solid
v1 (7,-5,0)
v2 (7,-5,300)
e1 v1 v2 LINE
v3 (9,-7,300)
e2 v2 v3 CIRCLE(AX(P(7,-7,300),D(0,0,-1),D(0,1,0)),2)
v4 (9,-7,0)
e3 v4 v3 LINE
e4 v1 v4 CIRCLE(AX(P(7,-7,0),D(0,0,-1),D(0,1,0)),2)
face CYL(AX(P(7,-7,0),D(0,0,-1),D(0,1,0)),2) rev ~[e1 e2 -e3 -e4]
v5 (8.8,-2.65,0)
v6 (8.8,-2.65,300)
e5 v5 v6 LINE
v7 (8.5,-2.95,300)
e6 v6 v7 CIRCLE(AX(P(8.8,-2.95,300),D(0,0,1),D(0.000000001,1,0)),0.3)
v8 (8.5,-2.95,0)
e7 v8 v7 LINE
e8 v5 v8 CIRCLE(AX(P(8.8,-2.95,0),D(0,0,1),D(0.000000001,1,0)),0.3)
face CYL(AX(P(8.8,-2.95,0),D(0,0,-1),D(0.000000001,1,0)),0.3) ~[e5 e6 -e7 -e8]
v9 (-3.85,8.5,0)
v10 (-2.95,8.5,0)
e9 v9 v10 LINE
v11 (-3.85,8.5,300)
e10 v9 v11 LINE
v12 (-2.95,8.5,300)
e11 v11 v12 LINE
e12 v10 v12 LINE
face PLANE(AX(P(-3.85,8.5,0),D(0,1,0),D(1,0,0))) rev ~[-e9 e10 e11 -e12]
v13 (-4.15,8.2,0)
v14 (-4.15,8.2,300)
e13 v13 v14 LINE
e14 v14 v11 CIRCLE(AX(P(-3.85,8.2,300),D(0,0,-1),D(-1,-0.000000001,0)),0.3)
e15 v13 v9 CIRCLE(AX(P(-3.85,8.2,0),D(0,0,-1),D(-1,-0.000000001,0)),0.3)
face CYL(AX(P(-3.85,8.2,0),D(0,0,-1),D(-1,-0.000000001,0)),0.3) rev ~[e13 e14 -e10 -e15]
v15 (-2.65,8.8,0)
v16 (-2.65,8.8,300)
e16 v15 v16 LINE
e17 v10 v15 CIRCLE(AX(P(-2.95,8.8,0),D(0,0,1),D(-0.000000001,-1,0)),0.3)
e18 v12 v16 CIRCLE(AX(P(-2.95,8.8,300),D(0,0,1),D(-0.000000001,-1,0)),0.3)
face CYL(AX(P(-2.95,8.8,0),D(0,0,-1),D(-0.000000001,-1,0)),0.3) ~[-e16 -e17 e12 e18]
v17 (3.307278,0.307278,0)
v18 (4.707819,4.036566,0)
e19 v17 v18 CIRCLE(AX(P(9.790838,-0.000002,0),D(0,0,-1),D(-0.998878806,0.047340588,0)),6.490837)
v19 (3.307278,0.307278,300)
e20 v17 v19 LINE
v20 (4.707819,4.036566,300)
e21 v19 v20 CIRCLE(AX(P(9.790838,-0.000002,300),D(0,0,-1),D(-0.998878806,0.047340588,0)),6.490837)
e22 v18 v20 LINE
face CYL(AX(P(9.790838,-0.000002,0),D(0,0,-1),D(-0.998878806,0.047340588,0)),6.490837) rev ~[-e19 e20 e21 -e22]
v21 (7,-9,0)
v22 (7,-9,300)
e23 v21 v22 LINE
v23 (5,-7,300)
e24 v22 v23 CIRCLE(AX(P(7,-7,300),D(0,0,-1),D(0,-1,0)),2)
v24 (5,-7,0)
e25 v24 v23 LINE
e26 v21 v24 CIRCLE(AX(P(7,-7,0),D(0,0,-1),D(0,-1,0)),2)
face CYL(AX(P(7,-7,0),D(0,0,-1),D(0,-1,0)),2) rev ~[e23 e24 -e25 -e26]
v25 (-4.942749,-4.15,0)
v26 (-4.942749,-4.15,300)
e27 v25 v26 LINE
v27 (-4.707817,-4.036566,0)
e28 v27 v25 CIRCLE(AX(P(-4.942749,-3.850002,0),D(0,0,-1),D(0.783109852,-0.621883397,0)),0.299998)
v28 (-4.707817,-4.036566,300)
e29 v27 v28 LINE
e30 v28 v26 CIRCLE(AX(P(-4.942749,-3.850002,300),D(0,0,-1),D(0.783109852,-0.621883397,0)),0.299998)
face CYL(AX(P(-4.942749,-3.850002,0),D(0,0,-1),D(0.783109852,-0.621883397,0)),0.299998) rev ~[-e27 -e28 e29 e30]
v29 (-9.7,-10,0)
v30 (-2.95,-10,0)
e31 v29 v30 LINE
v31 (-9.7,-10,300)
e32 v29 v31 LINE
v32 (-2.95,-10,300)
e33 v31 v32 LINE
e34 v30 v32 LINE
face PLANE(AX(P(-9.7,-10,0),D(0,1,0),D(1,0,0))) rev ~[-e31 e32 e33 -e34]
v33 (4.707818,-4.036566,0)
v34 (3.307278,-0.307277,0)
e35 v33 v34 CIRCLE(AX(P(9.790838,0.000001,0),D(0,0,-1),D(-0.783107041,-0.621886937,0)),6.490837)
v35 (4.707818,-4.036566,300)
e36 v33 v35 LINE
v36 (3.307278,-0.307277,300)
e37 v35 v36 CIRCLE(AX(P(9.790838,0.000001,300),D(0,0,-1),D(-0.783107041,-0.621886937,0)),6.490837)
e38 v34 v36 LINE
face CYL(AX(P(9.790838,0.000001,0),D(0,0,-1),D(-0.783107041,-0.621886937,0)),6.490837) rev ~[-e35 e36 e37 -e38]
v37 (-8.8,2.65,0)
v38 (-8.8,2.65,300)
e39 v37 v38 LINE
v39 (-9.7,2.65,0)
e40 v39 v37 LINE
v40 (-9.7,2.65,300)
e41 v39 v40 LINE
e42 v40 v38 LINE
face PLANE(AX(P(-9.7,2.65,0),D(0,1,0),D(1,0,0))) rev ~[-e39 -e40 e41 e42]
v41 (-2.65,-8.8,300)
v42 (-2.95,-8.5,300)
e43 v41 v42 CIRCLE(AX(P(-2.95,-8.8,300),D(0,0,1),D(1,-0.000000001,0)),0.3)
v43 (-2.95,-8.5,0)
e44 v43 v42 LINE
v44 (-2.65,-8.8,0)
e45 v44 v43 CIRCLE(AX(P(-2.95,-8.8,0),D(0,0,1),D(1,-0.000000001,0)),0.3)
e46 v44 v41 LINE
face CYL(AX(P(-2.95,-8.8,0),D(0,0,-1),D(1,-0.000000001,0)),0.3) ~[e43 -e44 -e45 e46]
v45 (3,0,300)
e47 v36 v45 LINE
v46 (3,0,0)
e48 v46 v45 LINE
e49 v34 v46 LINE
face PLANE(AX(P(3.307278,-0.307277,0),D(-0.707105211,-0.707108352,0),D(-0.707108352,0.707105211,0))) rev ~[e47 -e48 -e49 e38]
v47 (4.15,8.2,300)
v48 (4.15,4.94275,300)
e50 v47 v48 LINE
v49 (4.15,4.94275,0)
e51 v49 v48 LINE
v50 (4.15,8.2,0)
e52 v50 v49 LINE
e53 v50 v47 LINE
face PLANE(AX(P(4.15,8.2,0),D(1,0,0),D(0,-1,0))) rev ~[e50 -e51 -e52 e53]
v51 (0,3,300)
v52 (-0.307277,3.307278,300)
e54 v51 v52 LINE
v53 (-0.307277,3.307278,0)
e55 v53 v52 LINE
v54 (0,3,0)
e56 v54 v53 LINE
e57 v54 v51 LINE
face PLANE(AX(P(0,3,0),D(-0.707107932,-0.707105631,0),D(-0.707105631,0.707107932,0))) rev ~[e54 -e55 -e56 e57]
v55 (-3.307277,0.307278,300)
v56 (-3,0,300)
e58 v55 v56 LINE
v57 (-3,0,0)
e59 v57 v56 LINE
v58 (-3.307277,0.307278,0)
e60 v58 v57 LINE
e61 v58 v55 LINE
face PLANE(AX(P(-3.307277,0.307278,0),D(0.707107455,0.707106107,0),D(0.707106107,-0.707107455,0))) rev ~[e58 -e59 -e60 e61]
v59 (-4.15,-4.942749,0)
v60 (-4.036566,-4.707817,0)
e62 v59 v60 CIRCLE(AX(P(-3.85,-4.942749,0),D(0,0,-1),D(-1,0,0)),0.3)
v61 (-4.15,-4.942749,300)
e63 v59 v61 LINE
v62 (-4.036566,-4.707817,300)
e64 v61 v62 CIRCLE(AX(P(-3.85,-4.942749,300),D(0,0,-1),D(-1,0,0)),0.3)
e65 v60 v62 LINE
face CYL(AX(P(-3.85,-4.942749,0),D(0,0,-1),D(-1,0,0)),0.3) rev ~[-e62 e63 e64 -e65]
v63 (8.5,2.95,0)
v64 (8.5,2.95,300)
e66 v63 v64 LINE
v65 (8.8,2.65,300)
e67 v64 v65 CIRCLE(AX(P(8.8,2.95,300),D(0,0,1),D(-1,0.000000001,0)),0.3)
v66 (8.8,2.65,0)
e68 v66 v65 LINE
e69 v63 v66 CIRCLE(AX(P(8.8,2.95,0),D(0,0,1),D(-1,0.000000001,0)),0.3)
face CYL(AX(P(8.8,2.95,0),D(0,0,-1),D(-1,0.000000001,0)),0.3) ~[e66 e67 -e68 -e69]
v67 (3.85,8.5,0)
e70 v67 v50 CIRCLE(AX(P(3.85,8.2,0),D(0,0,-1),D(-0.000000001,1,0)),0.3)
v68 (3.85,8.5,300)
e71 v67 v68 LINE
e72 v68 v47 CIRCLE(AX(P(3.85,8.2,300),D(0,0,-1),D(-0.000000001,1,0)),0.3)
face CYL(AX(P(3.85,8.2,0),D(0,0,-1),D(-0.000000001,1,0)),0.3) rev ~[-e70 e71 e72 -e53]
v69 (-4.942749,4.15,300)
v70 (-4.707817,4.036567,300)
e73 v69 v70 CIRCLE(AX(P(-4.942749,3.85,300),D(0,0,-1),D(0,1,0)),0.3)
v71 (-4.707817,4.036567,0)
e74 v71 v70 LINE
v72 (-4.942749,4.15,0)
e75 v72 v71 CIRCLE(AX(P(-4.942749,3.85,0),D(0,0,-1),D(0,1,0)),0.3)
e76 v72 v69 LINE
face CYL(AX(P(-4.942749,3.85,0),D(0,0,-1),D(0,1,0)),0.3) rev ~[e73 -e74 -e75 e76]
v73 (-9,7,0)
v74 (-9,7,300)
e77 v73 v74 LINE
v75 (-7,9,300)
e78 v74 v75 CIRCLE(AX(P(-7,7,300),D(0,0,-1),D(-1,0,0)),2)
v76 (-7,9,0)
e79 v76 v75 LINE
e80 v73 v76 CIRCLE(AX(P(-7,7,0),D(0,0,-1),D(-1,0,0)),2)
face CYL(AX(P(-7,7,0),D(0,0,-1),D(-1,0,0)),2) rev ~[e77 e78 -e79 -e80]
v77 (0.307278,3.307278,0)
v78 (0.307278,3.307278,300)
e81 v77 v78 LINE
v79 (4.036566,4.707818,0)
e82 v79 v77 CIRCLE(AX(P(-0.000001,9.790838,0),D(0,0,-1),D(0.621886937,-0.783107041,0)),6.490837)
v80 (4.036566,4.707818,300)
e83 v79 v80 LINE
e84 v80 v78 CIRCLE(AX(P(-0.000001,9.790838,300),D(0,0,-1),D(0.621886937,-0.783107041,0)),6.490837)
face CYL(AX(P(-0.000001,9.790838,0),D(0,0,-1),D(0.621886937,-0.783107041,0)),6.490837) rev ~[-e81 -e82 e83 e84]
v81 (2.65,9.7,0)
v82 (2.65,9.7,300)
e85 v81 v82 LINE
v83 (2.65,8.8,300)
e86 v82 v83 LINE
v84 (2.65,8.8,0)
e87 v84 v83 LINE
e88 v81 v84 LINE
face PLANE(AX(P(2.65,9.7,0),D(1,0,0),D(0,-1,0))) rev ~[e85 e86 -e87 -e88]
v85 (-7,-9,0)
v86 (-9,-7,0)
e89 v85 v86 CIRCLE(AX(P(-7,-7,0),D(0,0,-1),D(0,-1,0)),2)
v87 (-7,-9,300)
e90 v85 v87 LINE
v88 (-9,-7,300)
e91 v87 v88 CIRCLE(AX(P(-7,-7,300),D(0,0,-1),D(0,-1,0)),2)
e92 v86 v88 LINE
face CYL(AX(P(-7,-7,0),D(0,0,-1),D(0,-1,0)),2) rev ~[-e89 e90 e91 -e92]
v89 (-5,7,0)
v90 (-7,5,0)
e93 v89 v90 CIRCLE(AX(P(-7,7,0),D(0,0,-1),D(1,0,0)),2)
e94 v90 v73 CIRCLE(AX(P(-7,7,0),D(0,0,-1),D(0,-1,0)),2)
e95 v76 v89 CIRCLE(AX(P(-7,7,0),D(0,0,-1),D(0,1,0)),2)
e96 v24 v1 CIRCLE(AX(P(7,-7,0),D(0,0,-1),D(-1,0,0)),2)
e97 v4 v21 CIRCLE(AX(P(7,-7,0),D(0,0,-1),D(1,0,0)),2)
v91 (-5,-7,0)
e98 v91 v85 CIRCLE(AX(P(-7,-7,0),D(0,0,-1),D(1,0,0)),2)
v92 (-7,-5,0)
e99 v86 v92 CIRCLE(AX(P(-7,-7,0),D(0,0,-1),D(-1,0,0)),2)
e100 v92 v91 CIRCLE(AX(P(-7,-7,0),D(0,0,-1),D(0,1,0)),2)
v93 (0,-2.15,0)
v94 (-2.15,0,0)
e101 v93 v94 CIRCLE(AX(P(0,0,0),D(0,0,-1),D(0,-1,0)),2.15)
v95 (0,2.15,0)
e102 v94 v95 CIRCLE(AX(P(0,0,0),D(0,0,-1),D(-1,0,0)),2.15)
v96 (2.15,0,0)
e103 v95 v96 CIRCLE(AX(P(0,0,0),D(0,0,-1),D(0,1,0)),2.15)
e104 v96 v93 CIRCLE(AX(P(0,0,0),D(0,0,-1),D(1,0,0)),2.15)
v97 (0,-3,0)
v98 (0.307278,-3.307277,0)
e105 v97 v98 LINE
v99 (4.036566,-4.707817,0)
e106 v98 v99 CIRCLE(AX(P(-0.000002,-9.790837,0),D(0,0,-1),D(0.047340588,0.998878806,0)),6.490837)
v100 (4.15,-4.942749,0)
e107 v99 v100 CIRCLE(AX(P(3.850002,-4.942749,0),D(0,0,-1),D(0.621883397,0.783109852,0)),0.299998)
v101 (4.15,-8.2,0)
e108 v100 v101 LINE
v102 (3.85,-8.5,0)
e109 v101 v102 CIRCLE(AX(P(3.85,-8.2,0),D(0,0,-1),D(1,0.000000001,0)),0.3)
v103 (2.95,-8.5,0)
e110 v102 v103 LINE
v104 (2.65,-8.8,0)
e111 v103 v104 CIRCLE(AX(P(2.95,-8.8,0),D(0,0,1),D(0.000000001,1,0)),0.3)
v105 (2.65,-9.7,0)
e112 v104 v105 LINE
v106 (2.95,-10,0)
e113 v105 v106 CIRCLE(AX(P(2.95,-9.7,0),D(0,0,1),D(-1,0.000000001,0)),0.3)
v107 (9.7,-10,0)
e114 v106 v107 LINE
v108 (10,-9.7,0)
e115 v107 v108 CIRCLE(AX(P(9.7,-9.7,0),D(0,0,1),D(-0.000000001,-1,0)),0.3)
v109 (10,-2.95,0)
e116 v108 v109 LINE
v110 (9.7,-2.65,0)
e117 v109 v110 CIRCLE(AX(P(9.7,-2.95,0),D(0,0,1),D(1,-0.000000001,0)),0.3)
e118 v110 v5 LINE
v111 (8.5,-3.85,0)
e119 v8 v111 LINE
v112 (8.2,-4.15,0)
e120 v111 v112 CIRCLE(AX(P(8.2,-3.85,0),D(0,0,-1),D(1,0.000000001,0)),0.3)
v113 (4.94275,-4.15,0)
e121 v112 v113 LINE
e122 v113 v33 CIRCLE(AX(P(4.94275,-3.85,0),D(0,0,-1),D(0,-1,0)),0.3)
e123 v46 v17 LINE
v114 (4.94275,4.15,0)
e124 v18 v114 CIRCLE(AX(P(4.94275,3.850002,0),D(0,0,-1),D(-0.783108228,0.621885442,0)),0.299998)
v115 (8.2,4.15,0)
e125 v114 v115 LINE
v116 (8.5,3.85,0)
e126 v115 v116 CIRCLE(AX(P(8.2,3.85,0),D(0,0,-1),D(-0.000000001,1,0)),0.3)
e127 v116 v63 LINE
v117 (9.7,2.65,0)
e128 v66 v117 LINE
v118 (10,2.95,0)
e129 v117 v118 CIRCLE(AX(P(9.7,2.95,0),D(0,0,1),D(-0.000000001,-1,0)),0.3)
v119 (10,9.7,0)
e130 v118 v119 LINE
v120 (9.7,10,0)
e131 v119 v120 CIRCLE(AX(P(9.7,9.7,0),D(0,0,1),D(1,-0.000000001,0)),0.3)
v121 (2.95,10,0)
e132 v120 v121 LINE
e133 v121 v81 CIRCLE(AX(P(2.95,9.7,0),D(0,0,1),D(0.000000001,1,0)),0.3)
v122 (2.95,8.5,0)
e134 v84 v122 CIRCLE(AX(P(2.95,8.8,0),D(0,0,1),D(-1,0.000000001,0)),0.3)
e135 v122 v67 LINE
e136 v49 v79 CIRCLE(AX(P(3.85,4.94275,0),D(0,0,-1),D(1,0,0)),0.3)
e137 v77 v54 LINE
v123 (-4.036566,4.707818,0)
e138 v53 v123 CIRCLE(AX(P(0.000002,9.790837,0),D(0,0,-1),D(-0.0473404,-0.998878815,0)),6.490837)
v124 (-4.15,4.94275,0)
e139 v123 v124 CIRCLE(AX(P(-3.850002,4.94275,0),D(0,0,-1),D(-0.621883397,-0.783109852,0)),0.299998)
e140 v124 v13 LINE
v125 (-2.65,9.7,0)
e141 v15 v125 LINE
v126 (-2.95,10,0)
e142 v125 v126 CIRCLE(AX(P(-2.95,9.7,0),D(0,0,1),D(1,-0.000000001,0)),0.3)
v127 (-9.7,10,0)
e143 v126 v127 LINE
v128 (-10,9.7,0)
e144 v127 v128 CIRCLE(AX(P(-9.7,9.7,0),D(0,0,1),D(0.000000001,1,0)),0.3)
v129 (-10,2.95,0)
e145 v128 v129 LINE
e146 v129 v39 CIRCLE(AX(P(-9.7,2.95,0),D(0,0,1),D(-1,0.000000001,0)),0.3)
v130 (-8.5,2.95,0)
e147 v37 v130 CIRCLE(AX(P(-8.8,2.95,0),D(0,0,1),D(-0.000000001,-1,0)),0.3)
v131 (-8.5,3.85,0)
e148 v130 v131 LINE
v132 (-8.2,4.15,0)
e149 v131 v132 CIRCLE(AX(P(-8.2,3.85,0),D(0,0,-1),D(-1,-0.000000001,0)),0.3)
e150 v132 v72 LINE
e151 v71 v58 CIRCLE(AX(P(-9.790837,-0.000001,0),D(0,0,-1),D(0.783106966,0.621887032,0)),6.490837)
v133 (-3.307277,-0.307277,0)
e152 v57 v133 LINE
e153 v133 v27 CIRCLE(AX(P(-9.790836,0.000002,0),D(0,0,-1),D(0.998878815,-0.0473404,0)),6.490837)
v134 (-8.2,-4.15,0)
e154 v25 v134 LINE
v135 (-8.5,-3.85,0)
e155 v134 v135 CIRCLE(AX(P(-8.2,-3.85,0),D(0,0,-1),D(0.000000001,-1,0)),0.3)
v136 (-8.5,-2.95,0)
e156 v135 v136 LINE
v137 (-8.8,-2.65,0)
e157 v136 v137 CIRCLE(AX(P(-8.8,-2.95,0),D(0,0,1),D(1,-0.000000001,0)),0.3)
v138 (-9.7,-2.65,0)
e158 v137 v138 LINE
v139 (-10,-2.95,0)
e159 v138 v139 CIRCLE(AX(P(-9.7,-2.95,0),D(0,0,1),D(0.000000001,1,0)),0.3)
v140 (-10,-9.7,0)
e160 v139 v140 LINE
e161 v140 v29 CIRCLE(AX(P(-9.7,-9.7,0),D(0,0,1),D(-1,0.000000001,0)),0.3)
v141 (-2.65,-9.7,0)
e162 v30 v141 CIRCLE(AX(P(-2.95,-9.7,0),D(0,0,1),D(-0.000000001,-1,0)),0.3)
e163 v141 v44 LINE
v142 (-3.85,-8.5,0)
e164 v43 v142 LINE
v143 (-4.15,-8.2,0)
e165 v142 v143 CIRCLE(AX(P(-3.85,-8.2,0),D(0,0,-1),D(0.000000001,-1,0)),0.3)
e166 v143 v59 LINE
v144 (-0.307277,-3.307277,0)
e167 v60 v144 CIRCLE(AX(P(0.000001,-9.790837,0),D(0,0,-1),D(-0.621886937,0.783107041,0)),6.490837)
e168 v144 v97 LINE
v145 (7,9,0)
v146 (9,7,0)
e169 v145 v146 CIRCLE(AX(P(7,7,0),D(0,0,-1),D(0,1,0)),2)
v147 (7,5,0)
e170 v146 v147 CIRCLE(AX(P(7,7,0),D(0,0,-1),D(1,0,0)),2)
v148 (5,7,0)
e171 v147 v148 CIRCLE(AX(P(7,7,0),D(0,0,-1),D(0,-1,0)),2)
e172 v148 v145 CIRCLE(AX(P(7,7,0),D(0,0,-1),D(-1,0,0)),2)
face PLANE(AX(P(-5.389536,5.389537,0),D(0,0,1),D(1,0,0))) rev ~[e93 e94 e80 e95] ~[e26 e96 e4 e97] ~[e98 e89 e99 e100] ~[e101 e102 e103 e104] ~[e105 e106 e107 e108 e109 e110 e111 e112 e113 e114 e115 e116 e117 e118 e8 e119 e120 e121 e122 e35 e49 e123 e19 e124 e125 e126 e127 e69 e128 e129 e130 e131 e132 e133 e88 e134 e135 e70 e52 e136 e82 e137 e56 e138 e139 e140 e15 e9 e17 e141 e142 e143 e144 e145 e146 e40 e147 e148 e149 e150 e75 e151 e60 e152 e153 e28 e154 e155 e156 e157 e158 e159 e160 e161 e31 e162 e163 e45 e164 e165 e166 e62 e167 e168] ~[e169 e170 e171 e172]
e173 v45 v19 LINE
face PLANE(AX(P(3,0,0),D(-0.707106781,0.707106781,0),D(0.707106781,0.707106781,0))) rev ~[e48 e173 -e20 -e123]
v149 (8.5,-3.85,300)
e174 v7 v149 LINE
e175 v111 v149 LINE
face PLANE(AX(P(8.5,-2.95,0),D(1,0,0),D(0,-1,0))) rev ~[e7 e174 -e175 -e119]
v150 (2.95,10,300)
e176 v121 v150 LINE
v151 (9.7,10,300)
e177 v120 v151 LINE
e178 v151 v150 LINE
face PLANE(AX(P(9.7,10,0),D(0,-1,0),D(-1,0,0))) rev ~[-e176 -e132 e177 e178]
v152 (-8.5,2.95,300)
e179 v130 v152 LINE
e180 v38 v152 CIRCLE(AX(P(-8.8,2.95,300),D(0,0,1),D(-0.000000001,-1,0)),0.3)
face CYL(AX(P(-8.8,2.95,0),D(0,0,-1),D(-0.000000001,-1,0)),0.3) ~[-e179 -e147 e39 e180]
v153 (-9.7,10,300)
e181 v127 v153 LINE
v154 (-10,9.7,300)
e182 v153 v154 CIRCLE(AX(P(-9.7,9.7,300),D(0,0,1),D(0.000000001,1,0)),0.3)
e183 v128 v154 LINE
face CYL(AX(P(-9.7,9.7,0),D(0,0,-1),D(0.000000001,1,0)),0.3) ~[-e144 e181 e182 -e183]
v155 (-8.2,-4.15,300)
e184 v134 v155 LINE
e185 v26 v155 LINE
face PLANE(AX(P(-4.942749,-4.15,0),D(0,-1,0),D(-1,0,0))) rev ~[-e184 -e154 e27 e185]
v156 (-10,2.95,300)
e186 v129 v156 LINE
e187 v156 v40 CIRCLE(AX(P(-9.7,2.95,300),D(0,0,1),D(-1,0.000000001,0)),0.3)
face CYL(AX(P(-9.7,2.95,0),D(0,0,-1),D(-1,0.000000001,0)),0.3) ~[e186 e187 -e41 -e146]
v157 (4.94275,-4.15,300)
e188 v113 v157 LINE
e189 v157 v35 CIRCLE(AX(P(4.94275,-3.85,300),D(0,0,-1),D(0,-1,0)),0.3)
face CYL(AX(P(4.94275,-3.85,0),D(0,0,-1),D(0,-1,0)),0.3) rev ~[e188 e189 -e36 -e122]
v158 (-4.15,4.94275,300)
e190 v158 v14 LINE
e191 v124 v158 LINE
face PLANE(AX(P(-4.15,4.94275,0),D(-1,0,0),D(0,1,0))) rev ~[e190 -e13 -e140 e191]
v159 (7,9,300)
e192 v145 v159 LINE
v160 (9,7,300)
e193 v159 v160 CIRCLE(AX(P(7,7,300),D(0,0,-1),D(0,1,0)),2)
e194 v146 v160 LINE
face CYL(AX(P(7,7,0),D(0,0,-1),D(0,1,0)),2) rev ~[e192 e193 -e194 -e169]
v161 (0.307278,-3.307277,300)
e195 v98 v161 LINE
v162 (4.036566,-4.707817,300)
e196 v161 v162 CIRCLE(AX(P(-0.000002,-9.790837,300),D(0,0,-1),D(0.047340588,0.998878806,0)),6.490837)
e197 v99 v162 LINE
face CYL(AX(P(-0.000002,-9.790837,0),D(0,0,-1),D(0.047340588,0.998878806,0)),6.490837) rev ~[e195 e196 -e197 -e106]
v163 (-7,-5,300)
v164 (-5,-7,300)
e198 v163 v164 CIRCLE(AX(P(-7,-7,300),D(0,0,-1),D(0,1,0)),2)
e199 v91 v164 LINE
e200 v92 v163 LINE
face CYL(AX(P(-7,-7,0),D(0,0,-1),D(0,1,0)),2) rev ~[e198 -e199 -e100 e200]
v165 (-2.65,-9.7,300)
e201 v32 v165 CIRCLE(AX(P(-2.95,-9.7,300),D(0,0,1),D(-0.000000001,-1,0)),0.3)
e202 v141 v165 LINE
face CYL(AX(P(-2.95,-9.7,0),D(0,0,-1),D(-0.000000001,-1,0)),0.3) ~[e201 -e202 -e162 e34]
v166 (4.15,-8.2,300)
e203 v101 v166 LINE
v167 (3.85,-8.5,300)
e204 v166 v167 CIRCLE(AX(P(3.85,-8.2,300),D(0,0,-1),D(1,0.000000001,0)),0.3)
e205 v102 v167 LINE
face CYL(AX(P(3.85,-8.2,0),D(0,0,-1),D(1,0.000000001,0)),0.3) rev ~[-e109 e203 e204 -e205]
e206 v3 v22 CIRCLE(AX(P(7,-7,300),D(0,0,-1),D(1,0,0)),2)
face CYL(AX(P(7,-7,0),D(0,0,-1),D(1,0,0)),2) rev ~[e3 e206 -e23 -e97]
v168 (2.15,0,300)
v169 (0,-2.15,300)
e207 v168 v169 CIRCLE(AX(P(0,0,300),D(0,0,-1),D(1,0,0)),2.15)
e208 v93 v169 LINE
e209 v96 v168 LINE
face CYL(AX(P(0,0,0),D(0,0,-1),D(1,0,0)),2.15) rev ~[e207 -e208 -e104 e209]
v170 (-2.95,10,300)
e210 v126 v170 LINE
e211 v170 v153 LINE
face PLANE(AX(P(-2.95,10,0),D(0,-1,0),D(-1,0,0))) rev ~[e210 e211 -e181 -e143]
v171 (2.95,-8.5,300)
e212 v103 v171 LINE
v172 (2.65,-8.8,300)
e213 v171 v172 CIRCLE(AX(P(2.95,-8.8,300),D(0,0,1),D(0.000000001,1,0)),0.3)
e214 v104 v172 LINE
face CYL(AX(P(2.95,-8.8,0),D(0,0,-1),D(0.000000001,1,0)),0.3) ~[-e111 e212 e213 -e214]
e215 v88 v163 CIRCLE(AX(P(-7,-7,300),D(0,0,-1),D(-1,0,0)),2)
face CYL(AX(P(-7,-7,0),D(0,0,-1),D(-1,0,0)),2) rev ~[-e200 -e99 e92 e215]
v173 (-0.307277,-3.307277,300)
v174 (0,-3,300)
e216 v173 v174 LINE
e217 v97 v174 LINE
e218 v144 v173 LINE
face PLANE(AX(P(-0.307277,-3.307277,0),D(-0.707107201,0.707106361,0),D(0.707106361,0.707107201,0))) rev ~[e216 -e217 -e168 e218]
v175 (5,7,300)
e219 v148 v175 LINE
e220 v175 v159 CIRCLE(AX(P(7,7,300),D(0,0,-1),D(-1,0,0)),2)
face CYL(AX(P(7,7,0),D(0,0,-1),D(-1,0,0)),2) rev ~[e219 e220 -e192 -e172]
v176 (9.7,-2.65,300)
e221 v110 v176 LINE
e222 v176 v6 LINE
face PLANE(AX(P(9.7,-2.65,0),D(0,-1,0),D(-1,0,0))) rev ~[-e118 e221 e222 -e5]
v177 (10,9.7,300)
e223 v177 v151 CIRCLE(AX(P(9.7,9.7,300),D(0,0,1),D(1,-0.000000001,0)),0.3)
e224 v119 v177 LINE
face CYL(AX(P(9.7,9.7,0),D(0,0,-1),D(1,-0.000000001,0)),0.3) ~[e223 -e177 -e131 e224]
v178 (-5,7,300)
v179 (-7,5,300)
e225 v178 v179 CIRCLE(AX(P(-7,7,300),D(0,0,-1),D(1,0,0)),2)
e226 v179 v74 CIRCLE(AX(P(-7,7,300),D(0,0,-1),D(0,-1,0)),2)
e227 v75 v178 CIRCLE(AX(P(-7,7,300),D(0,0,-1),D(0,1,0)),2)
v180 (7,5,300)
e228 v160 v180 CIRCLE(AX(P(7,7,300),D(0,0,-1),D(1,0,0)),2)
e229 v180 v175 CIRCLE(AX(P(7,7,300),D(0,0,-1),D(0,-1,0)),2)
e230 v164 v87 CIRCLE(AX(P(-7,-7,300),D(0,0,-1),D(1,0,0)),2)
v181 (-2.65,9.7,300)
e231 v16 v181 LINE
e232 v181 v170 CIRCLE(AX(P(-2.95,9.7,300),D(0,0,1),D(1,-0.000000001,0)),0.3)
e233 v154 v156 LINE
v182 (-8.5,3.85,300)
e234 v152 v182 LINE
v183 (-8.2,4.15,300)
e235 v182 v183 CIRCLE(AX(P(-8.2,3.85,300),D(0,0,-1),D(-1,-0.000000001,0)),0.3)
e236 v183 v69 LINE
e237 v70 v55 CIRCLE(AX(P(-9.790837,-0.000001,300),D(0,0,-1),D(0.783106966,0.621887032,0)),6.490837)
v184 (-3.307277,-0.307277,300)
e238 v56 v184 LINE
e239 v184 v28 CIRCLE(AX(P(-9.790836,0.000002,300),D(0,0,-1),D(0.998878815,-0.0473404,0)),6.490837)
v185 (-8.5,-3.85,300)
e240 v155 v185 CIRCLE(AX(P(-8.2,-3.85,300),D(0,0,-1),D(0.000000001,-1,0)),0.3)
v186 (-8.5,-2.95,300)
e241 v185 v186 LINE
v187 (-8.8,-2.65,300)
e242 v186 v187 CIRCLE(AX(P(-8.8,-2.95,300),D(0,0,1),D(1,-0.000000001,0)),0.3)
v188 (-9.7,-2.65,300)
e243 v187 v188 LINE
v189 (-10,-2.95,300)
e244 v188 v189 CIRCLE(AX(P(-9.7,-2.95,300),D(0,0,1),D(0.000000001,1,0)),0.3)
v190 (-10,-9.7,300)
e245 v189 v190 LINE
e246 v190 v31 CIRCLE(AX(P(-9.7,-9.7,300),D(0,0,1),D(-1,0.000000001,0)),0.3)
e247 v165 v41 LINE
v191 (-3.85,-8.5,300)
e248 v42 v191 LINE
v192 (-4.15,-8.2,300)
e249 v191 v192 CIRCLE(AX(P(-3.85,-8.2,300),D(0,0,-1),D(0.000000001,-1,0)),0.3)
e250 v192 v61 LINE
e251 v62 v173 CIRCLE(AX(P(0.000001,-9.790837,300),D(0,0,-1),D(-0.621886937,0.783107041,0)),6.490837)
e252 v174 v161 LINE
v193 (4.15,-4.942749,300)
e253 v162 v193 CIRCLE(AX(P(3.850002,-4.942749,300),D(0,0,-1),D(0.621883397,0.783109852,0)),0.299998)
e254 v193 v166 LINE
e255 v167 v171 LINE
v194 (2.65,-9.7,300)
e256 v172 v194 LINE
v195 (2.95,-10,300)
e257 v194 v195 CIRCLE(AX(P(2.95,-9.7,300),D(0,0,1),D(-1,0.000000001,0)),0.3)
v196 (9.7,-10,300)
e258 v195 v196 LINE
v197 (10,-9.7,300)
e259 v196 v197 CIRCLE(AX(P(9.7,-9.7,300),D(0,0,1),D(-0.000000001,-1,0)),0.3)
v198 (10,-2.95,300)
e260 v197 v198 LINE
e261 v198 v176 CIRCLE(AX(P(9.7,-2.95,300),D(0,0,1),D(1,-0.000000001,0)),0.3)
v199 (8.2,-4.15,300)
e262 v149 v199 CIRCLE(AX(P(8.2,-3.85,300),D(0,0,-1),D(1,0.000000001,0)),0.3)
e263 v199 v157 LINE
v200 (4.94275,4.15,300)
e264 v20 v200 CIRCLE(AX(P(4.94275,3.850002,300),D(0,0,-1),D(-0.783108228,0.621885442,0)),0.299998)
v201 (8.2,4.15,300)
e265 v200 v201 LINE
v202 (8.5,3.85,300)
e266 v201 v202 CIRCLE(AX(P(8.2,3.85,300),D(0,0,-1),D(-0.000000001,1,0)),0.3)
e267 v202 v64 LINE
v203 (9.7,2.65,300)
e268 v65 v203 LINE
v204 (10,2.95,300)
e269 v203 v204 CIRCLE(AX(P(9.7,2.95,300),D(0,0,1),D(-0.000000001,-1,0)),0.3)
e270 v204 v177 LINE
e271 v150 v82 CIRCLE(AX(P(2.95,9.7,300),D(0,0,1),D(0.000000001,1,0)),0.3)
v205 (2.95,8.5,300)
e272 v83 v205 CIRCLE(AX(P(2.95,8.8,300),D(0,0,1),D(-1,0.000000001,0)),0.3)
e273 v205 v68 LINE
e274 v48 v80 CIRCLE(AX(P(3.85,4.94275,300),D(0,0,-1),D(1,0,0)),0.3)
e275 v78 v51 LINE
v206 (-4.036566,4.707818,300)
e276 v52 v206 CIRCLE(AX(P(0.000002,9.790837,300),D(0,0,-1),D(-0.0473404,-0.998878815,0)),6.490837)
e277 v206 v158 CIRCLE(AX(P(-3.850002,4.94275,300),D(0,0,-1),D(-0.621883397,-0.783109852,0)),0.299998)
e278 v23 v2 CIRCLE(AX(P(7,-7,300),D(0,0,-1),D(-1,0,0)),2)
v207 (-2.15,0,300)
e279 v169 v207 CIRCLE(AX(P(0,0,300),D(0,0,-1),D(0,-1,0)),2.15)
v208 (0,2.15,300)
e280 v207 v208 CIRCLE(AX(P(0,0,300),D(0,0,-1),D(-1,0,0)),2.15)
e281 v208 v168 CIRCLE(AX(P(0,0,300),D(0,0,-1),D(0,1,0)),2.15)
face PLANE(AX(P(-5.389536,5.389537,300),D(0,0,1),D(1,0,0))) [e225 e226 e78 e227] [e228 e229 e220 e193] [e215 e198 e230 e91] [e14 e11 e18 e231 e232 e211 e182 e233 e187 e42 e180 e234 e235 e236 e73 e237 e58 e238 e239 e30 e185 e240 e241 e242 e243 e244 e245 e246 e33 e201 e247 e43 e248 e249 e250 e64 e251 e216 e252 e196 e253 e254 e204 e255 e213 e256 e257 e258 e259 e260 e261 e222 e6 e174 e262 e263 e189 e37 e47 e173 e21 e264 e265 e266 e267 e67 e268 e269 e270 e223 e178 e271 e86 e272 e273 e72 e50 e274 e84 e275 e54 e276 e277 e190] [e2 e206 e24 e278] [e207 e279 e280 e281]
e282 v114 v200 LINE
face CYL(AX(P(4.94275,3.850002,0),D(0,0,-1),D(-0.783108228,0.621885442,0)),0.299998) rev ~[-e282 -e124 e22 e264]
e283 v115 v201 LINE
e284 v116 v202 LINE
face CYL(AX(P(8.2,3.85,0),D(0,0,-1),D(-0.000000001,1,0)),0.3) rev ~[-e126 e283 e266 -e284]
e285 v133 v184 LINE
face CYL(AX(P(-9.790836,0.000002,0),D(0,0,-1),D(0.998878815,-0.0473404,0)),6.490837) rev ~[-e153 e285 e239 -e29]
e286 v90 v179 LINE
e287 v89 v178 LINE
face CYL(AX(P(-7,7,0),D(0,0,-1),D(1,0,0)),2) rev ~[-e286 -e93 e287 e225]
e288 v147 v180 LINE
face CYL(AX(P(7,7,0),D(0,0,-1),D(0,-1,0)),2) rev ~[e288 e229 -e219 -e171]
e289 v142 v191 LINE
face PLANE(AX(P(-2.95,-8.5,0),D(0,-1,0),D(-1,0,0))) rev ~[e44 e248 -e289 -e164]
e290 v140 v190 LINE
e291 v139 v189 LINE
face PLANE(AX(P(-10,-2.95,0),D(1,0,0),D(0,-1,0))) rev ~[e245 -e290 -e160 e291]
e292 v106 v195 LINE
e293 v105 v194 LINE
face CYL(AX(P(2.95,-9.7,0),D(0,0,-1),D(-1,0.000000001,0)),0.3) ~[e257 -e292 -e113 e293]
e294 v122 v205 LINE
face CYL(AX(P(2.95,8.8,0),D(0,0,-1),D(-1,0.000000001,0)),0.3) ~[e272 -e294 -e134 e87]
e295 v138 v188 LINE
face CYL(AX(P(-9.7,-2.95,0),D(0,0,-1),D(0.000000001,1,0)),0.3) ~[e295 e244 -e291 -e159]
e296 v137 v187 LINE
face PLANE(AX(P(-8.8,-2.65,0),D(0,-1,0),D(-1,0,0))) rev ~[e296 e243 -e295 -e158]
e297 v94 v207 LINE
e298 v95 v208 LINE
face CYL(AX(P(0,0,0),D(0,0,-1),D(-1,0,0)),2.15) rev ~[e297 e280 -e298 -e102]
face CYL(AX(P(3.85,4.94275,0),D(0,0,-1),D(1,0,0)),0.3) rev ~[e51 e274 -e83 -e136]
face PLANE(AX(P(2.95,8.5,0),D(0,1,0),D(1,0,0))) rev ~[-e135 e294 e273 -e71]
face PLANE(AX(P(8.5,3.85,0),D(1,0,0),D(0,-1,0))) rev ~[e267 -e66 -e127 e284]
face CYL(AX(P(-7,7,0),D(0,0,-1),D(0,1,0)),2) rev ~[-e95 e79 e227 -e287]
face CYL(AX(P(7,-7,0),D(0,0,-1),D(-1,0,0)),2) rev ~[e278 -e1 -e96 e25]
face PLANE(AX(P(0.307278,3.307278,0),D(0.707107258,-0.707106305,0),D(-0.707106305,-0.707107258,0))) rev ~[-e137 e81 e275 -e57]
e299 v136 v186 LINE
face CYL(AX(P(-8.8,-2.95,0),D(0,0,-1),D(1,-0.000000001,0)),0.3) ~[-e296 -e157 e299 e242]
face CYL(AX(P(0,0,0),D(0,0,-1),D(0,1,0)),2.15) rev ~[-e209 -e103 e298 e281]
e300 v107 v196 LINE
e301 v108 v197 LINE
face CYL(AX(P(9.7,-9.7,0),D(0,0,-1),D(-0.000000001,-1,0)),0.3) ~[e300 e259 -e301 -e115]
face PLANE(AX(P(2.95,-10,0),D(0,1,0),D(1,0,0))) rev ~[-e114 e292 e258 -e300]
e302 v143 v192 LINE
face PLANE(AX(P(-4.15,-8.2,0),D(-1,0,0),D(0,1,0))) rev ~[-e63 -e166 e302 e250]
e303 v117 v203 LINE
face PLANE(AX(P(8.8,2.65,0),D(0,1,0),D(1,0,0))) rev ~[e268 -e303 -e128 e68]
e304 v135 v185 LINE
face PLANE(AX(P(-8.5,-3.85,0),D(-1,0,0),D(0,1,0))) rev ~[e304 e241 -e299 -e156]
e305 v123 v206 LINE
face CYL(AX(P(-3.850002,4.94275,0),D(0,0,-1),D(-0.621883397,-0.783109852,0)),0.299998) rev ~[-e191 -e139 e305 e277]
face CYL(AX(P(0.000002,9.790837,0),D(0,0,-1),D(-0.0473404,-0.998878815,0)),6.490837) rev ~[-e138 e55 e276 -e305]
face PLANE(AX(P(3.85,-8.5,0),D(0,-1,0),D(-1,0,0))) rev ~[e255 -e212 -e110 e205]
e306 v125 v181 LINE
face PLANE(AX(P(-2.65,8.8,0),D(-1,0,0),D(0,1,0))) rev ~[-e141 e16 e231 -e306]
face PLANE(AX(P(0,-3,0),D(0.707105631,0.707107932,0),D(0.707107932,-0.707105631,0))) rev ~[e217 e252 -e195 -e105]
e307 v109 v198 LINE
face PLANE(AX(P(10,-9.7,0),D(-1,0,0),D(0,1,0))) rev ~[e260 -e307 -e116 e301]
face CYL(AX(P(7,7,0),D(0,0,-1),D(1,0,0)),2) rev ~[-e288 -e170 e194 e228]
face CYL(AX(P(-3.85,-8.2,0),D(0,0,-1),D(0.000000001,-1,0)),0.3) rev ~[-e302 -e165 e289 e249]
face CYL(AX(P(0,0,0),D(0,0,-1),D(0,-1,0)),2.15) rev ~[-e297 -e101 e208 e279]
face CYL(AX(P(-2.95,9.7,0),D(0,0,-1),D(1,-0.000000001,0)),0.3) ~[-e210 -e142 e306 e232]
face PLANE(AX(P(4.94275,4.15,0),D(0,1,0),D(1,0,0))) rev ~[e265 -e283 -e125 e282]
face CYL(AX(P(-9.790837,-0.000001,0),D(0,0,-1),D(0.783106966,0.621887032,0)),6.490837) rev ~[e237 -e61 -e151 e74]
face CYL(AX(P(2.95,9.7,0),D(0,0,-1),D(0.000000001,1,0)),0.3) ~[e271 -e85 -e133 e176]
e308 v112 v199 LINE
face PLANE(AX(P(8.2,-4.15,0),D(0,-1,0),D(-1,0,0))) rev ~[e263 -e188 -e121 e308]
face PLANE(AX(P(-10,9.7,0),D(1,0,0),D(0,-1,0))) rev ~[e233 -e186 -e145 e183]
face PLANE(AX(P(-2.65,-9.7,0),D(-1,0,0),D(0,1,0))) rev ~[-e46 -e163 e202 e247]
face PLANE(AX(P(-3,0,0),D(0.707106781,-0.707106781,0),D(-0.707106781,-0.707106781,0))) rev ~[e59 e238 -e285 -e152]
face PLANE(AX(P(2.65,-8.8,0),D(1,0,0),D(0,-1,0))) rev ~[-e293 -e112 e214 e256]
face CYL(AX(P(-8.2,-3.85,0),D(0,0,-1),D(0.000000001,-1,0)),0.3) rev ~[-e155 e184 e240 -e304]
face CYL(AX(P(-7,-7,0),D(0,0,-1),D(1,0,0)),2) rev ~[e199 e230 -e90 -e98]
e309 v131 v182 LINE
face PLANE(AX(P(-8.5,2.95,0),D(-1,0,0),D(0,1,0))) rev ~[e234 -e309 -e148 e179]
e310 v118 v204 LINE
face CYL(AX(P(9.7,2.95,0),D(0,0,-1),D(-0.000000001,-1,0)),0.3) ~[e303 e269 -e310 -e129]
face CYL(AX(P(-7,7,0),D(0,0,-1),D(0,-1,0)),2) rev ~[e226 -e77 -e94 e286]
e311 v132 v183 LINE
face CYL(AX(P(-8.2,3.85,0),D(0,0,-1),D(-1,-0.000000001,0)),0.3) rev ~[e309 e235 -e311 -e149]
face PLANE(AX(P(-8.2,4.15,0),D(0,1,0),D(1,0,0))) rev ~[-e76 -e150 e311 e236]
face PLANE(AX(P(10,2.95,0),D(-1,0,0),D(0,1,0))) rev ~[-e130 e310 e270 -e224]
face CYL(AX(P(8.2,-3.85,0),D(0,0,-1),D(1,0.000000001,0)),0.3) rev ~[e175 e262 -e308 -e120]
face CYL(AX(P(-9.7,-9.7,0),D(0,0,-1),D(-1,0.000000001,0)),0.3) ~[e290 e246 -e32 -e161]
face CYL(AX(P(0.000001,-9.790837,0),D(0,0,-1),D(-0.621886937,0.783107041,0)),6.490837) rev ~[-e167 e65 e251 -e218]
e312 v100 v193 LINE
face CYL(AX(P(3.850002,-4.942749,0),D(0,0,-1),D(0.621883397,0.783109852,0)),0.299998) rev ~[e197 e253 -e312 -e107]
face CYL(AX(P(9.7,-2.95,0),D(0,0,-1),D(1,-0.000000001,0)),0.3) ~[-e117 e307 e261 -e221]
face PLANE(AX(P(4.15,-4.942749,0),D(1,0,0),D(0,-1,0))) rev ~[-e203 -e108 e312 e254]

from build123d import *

# Parameters (mm, degrees)
F1_DEPTH = 300


# Not quite as in the source:
# - ends of sketch curves that miss each other by under 0.0002 mm in the source are joined


with BuildPart() as f1:
    # F0 (on Top) → F1 (new body)
    with BuildSketch(Plane.XY):
        with BuildLine():
            ThreePointArc((-2.15, 0), (-1.5202795796, 1.5202795796), (0, 2.15))
            Line((0, 2.15), (0, 3))
            Line((0, 3), (-0.307277, 3.307278))
            ThreePointArc((-0.307277, 3.307278), (-2.2820211583, 3.7143800615), (-4.036565823, 4.7078182229))
            ThreePointArc((-4.036565823, 4.7078182229), (-4.1201572004, 4.8123081084), (-4.15, 4.94275))
            Line((-4.15, 4.94275), (-4.15, 8.2))
            ThreePointArc((-4.15, 8.2), (-4.0621320344, 8.4121320344), (-3.85, 8.5))
            Line((-3.85, 8.5), (-2.95, 8.5))
            ThreePointArc((-2.95, 8.5), (-2.7378679656, 8.5878679656), (-2.65, 8.8))
            Line((-2.65, 8.8), (-2.65, 9.7))
            ThreePointArc((-2.65, 9.7), (-2.7378679656, 9.9121320344), (-2.95, 10))
            Line((-2.95, 10), (-9.7, 10))
            ThreePointArc((-9.7, 10), (-9.9121320344, 9.9121320344), (-10, 9.7))
            Line((-10, 9.7), (-10, 2.95))
            ThreePointArc((-10, 2.95), (-9.9121320344, 2.7378679656), (-9.7, 2.65))
            Line((-9.7, 2.65), (-8.8, 2.65))
            ThreePointArc((-8.8, 2.65), (-8.5878679656, 2.7378679656), (-8.5, 2.95))
            Line((-8.5, 2.95), (-8.5, 3.85))
            ThreePointArc((-8.5, 3.85), (-8.4121320344, 4.0621320344), (-8.2, 4.15))
            Line((-8.2, 4.15), (-4.942749, 4.15))
            ThreePointArc((-4.942749, 4.15), (-4.812307461, 4.1201573706), (-4.7078173786, 4.0365666993))
            ThreePointArc((-4.7078173786, 4.0365666993), (-3.7143793747, 2.2820219924), (-3.3072773955, 0.3072779813))
            Line((-3.3072773955, 0.3072779813), (-3, 0))
            Line((-3, 0), (-2.15, 0))
        make_face()
        with BuildLine():
            ThreePointArc((-7, 5), (-8.4142135624, 5.5857864376), (-9, 7))
            ThreePointArc((-9, 7), (-8.4142135624, 8.4142135624), (-7, 9))
            ThreePointArc((-7, 9), (-5.5857864376, 8.4142135624), (-5, 7))
            ThreePointArc((-5, 7), (-5.5857864376, 5.5857864376), (-7, 5))
        make_face(mode=Mode.SUBTRACT)
        with BuildLine():
            ThreePointArc((0, 2.15), (1.5202795796, 1.5202795796), (2.15, 0))
            Line((2.15, 0), (3, 0))
            Line((3, 0), (3.307278, 0.307278))
            ThreePointArc((3.307278, 0.307278), (3.7143803747, 2.2820219924), (4.7078187099, 4.0365664363))
            ThreePointArc((4.7078187099, 4.0365664363), (4.812308461, 4.1201573706), (4.94275, 4.15))
            Line((4.94275, 4.15), (8.2, 4.15))
            ThreePointArc((8.2, 4.15), (8.4121320344, 4.0621320344), (8.5, 3.85))
            Line((8.5, 3.85), (8.5, 2.95))
            ThreePointArc((8.5, 2.95), (8.5878679656, 2.7378679656), (8.8, 2.65))
            Line((8.8, 2.65), (9.7, 2.65))
            ThreePointArc((9.7, 2.65), (9.9121320344, 2.7378679656), (10, 2.95))
            Line((10, 2.95), (10, 9.7))
            ThreePointArc((10, 9.7), (9.9121320344, 9.9121320344), (9.7, 10))
            Line((9.7, 10), (2.95, 10))
            ThreePointArc((2.95, 10), (2.7378679656, 9.9121320344), (2.65, 9.7))
            Line((2.65, 9.7), (2.65, 8.8))
            ThreePointArc((2.65, 8.8), (2.7378679656, 8.5878679656), (2.95, 8.5))
            Line((2.95, 8.5), (3.85, 8.5))
            ThreePointArc((3.85, 8.5), (4.0621320344, 8.4121320344), (4.15, 8.2))
            Line((4.15, 8.2), (4.15, 4.94275))
            ThreePointArc((4.15, 4.94275), (4.1201572004, 4.8123081084), (4.036566086, 4.7078178916))
            ThreePointArc((4.036566086, 4.7078178916), (2.2820216259, 3.7143802371), (0.3072779813, 3.3072783955))
            Line((0.3072779813, 3.3072783955), (0, 3))
            Line((0, 3), (0, 2.15))
        make_face()
        with BuildLine():
            ThreePointArc((7, 9), (8.4142135624, 8.4142135624), (9, 7))
            ThreePointArc((9, 7), (8.4142135624, 5.5857864376), (7, 5))
            ThreePointArc((7, 5), (5.5857864376, 5.5857864376), (5, 7))
            ThreePointArc((5, 7), (5.5857864376, 8.4142135624), (7, 9))
        make_face(mode=Mode.SUBTRACT)
        with BuildLine():
            Line((3, 0), (2.15, 0))
            ThreePointArc((2.15, 0), (1.5202795796, -1.5202795796), (0, -2.15))
            Line((0, -2.15), (0, -3))
            Line((0, -3), (0.307278, -3.307277))
            ThreePointArc((0.307278, -3.307277), (2.2820216259, -3.7143792371), (4.036565823, -4.7078172229))
            ThreePointArc((4.036565823, -4.7078172229), (4.1201572004, -4.8123071084), (4.15, -4.942749))
            Line((4.15, -4.942749), (4.15, -8.2))
            ThreePointArc((4.15, -8.2), (4.0621320344, -8.4121320344), (3.85, -8.5))
            Line((3.85, -8.5), (2.95, -8.5))
            ThreePointArc((2.95, -8.5), (2.7378679656, -8.5878679656), (2.65, -8.8))
            Line((2.65, -8.8), (2.65, -9.7))
            ThreePointArc((2.65, -9.7), (2.7378679656, -9.9121320344), (2.95, -10))
            Line((2.95, -10), (9.7, -10))
            ThreePointArc((9.7, -10), (9.9121320344, -9.9121320344), (10, -9.7))
            Line((10, -9.7), (10, -2.95))
            ThreePointArc((10, -2.95), (9.9121320344, -2.7378679656), (9.7, -2.65))
            Line((9.7, -2.65), (8.8, -2.65))
            ThreePointArc((8.8, -2.65), (8.5878679656, -2.7378679656), (8.5, -2.95))
            Line((8.5, -2.95), (8.5, -3.85))
            ThreePointArc((8.5, -3.85), (8.4121320344, -4.0621320344), (8.2, -4.15))
            Line((8.2, -4.15), (4.94275, -4.15))
            ThreePointArc((4.94275, -4.15), (4.8123081084, -4.1201572004), (4.7078178916, -4.036566086))
            ThreePointArc((4.7078178916, -4.036566086), (3.7143800615, -2.2820211583), (3.3072783483, -0.3072769835))
            Line((3.3072783483, -0.3072769835), (3, 0))
        make_face()
        with BuildLine():
            ThreePointArc((7, -5), (8.4142135624, -5.5857864376), (9, -7))
            ThreePointArc((9, -7), (8.4142135624, -8.4142135624), (7, -9))
            ThreePointArc((7, -9), (5.5857864376, -8.4142135624), (5, -7))
            ThreePointArc((5, -7), (5.5857864376, -5.5857864376), (7, -5))
        make_face(mode=Mode.SUBTRACT)
        with BuildLine():
            Line((0, -3), (0, -2.15))
            ThreePointArc((0, -2.15), (-1.5202795796, -1.5202795796), (-2.15, 0))
            Line((-2.15, 0), (-3, 0))
            Line((-3, 0), (-3.307277, -0.307277))
            ThreePointArc((-3.307277, -0.307277), (-3.7143790615, -2.2820211583), (-4.7078172229, -4.036565823))
            ThreePointArc((-4.7078172229, -4.036565823), (-4.8123071084, -4.1201572004), (-4.942749, -4.15))
            Line((-4.942749, -4.15), (-8.2, -4.15))
            ThreePointArc((-8.2, -4.15), (-8.4121320344, -4.0621320344), (-8.5, -3.85))
            Line((-8.5, -3.85), (-8.5, -2.95))
            ThreePointArc((-8.5, -2.95), (-8.5878679656, -2.7378679656), (-8.8, -2.65))
            Line((-8.8, -2.65), (-9.7, -2.65))
            ThreePointArc((-9.7, -2.65), (-9.9121320344, -2.7378679656), (-10, -2.95))
            Line((-10, -2.95), (-10, -9.7))
            ThreePointArc((-10, -9.7), (-9.9121320344, -9.9121320344), (-9.7, -10))
            Line((-9.7, -10), (-2.95, -10))
            ThreePointArc((-2.95, -10), (-2.7378679656, -9.9121320344), (-2.65, -9.7))
            Line((-2.65, -9.7), (-2.65, -8.8))
            ThreePointArc((-2.65, -8.8), (-2.7378679656, -8.5878679656), (-2.95, -8.5))
            Line((-2.95, -8.5), (-3.85, -8.5))
            ThreePointArc((-3.85, -8.5), (-4.0621320344, -8.4121320344), (-4.15, -8.2))
            Line((-4.15, -8.2), (-4.15, -4.942749))
            ThreePointArc((-4.15, -4.942749), (-4.1201572004, -4.8123071084), (-4.036566086, -4.7078168916))
            ThreePointArc((-4.036566086, -4.7078168916), (-2.2820211583, -3.7143790615), (-0.3072769835, -3.3072773483))
            Line((-0.3072769835, -3.3072773483), (0, -3))
        make_face()
        with BuildLine():
            ThreePointArc((-7, -9), (-8.4142135624, -8.4142135624), (-9, -7))
            ThreePointArc((-9, -7), (-8.4142135624, -5.5857864376), (-7, -5))
            ThreePointArc((-7, -5), (-5.5857864376, -5.5857864376), (-5, -7))
            ThreePointArc((-5, -7), (-5.5857864376, -8.4142135624), (-7, -9))
        make_face(mode=Mode.SUBTRACT)
    extrude(amount=F1_DEPTH)


solid = f1.part
